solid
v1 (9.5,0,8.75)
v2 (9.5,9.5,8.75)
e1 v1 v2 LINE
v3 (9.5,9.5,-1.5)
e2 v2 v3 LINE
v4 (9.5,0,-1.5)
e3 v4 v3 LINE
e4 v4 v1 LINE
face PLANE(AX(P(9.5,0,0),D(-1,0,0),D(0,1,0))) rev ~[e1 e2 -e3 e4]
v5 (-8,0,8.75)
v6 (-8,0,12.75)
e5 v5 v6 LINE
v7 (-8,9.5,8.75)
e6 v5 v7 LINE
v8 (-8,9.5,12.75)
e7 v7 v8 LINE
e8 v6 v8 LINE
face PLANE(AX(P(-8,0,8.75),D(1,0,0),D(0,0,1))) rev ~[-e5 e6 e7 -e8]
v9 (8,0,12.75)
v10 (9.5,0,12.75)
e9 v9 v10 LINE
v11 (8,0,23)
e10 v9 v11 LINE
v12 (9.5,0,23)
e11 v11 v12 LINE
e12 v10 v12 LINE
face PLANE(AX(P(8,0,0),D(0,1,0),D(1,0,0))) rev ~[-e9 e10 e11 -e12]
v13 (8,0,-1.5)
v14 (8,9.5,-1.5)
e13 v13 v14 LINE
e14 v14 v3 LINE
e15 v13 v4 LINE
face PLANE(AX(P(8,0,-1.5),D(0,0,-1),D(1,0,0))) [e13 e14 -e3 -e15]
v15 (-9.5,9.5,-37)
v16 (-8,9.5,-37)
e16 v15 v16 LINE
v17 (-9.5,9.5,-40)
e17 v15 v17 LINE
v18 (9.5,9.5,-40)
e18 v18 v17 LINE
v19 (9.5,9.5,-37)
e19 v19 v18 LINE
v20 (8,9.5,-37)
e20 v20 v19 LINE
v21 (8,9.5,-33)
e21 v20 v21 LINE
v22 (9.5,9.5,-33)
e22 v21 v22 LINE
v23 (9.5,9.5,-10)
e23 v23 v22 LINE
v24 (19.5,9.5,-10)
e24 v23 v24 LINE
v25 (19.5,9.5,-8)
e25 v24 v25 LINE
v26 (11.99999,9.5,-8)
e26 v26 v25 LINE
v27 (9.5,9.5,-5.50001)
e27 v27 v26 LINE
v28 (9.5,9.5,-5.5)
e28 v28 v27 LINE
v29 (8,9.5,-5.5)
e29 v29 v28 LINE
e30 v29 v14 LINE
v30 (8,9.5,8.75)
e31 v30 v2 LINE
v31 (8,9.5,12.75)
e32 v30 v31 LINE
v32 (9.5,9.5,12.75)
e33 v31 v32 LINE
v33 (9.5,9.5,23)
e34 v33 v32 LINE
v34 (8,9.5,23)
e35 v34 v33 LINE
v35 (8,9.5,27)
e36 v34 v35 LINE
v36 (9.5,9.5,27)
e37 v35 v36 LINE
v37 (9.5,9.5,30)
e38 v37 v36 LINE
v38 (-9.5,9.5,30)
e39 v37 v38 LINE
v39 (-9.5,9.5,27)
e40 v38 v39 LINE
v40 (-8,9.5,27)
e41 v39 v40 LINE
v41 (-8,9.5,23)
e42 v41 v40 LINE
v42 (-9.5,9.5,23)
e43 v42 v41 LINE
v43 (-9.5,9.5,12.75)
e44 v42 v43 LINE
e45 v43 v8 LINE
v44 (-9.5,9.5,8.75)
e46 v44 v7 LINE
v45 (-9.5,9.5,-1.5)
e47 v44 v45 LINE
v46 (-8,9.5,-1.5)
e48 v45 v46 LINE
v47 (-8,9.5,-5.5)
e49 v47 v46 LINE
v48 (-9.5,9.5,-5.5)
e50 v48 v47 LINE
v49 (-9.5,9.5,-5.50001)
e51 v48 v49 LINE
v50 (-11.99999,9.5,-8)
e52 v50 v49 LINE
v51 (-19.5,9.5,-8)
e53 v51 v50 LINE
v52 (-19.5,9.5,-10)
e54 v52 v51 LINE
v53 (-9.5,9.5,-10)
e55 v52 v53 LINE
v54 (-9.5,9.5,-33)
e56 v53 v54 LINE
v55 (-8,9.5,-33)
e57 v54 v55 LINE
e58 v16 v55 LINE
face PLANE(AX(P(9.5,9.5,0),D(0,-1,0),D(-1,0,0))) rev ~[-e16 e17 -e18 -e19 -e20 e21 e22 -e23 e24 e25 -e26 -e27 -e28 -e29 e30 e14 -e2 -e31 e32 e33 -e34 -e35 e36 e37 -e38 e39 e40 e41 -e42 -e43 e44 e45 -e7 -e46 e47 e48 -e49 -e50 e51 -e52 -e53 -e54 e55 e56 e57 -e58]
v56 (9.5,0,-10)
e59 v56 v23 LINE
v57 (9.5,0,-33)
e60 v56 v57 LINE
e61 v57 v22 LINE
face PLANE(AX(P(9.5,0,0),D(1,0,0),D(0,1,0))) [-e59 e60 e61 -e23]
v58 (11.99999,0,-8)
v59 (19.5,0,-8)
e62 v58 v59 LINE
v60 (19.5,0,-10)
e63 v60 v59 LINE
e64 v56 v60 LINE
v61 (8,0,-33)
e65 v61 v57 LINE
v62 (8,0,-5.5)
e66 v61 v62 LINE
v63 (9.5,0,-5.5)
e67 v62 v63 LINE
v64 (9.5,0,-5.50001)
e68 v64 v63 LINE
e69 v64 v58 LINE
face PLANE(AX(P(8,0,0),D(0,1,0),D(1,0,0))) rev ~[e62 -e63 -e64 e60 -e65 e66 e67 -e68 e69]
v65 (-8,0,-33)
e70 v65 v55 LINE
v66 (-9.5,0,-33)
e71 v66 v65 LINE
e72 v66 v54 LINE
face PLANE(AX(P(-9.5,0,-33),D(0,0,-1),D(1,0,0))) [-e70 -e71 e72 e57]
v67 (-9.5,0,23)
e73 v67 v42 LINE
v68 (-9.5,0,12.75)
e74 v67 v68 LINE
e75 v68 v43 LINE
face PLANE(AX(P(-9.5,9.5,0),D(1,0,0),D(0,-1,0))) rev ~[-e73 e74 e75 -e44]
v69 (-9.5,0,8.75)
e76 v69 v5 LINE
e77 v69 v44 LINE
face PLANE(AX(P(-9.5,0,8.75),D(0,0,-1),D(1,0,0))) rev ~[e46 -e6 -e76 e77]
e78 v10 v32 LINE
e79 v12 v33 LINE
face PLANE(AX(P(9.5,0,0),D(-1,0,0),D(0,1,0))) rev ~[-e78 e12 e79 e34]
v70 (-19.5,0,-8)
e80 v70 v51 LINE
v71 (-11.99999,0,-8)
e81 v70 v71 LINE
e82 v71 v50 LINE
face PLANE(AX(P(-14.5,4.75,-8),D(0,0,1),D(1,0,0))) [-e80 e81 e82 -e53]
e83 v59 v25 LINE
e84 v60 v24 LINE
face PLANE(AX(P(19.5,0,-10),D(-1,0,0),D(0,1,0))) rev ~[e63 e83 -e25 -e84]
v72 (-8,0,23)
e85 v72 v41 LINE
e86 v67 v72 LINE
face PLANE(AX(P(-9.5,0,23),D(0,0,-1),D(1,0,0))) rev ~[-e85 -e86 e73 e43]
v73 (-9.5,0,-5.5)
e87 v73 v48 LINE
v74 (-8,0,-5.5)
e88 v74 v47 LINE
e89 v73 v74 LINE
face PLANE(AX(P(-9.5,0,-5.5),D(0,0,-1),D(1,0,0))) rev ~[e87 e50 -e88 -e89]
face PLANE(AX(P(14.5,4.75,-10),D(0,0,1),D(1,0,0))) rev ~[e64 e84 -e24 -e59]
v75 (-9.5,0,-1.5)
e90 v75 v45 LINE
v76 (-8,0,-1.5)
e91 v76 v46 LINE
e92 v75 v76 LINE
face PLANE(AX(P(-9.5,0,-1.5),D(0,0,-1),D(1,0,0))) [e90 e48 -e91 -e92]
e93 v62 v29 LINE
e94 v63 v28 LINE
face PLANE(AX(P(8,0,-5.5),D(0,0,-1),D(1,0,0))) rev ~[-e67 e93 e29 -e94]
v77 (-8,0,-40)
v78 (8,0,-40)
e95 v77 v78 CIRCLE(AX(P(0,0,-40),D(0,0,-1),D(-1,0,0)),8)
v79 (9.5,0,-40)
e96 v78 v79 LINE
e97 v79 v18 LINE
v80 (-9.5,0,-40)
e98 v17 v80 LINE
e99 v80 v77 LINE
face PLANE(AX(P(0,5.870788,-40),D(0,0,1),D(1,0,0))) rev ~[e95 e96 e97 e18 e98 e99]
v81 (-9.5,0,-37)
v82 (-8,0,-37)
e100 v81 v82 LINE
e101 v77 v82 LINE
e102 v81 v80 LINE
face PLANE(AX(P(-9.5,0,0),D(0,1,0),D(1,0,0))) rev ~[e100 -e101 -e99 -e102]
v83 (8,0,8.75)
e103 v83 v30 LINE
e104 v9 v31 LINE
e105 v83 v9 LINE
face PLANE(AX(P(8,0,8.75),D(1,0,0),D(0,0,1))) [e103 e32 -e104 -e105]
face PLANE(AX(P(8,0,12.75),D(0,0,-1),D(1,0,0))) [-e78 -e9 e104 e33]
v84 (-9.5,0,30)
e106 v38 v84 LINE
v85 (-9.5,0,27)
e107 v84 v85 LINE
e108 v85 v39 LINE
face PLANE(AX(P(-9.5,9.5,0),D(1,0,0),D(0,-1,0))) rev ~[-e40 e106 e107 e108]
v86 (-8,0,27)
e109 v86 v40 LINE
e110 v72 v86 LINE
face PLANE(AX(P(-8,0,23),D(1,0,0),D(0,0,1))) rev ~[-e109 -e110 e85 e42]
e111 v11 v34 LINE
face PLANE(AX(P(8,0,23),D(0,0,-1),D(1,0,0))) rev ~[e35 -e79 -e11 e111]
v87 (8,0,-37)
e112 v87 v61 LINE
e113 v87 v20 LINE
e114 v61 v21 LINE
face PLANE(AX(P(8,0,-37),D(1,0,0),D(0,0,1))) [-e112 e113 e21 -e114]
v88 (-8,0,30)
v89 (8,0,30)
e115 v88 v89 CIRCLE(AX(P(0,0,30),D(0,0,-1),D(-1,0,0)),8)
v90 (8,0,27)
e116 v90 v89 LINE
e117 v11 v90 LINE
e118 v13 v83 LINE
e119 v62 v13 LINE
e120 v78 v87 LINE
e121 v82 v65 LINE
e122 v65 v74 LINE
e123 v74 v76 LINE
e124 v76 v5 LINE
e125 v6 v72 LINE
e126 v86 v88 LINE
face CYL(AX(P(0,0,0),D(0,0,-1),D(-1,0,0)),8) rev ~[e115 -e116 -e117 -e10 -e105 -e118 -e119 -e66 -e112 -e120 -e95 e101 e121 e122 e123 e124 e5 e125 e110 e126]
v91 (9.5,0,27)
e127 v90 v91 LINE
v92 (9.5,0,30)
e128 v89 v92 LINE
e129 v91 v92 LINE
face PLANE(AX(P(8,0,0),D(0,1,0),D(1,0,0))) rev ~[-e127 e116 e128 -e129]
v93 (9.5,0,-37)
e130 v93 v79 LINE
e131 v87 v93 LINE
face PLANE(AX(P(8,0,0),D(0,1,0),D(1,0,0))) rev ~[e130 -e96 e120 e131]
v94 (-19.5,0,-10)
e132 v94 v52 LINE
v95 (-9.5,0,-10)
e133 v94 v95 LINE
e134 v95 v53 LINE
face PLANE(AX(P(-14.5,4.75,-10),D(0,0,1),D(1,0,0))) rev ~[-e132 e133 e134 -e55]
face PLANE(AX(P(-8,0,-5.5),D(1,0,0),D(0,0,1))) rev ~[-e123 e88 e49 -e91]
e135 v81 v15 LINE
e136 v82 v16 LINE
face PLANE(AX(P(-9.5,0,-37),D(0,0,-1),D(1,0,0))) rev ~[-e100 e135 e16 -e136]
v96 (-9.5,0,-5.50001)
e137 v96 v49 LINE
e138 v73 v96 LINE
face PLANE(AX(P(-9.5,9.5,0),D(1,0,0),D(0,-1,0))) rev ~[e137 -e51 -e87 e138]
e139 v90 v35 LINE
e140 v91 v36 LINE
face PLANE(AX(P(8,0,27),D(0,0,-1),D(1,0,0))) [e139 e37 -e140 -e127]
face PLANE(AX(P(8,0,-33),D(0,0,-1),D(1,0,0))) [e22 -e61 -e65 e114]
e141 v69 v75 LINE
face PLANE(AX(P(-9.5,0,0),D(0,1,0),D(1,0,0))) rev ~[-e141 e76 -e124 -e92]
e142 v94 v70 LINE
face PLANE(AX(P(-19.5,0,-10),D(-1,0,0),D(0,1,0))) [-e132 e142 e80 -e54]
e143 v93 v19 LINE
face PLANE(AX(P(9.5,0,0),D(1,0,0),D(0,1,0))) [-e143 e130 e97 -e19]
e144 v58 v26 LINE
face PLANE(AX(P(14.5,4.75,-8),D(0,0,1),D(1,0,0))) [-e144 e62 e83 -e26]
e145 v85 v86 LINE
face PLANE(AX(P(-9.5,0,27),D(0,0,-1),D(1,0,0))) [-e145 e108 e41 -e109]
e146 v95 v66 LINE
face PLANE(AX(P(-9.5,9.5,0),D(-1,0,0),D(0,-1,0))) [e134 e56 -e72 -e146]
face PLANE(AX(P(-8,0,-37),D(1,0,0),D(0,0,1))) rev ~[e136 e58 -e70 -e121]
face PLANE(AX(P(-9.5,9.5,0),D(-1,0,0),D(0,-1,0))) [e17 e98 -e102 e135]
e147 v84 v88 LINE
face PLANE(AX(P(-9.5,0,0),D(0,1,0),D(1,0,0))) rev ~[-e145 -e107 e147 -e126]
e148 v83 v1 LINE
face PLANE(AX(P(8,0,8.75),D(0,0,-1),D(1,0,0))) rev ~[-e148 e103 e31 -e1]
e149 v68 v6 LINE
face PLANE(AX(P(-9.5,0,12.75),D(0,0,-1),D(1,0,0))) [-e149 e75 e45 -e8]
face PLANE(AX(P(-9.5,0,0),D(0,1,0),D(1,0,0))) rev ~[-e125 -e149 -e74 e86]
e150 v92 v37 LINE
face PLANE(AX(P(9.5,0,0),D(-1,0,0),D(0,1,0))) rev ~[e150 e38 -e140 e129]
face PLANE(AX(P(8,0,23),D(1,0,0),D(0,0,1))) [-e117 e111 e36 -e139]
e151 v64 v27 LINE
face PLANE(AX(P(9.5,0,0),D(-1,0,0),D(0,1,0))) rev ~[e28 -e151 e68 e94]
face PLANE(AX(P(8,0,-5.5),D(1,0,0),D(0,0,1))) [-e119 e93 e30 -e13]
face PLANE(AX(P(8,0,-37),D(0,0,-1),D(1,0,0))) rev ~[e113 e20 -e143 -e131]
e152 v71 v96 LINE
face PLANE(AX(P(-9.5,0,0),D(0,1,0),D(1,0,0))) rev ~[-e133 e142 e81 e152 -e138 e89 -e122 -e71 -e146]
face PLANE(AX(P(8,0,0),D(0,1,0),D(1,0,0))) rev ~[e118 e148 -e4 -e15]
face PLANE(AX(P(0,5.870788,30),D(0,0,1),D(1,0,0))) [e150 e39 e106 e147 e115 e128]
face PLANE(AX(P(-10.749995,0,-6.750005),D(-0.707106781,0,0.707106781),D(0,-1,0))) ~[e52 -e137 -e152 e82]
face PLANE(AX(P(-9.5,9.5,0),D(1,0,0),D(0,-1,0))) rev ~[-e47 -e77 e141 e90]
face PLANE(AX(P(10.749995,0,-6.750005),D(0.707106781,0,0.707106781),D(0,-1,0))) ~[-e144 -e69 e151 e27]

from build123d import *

# Parameters (mm, degrees)
F1_DEPTH = 40
F3_W     = 10
F3_H     = 9.5
F4_DEPTH = 2
F5_DEPTH = 30
F6_W     = 1.5
F6_H     = 4
F7_DEPTH = 9.501
F8_SIZE  = 2.49999


# Not quite as in the source:
# - a fillet or chamfer is up to 0.001 mm smaller than in the source, because OpenCascade refuses the exact size


with BuildPart() as f1:
    # F0 (on Top) → F1 (new body)
    with BuildSketch(Plane.XY):
        with BuildLine():
            Line((-9.5, 0), (-8, 0))
            ThreePointArc((-8, 0), (0, 8), (8, 0))
            Line((8, 0), (9.5, 0))
            Line((9.5, 0), (9.5, 9.5))
            Line((9.5, 9.5), (-9.5, 9.5))
            Line((-9.5, 9.5), (-9.5, 0))
        make_face()
    extrude(amount=-F1_DEPTH)

    # F3 (on offset) → F4 (join)
    with BuildSketch(Plane.XY.offset(-10)):
        with Locations((-14.5, 4.75)):
            Rectangle(F3_W, F3_H)
        with Locations((14.5, 4.75)):
            Rectangle(F3_W, F3_H)
    extrude(amount=F4_DEPTH)

    # F5 (add): a face of the model
    f5_faces = [f1.faces().sort_by_distance(p)[0] for p in [
        (-8.75, 0.2124264579, 0),
    ]]
    extrude(f5_faces, amount=F5_DEPTH)

    # F6 (on face) → F7 (cut, through all)
    with BuildSketch(Plane.XZ):
        with Locations((-8.75, -3.5)):
            Rectangle(F6_W, F6_H)
        with Locations((-8.75, -35)):
            Rectangle(F6_W, F6_H)
        with Locations((8.75, -3.5)):
            Rectangle(F6_W, F6_H)
        with Locations((8.75, -35)):
            Rectangle(F6_W, F6_H)
        with Locations((-8.75, 25)):
            Rectangle(F6_W, F6_H)
        with Locations((8.75, 25)):
            Rectangle(F6_W, F6_H)
        with Locations((-8.75, 10.75)):
            Rectangle(F6_W, F6_H)
        with Locations((8.75, 10.75)):
            Rectangle(F6_W, F6_H)
    extrude(amount=-F7_DEPTH, mode=Mode.SUBTRACT)

    # F8 (size 2.5 in the source; OpenCascade refuses exactly that, so slightly less here)
    f8_edges = [f1.edges().sort_by_distance(p)[0] for p in [
        (-9.5, 4.75, -8),
        (9.5, 4.75, -8),
    ]]
    chamfer(f8_edges, length=F8_SIZE)


solid = f1.part
